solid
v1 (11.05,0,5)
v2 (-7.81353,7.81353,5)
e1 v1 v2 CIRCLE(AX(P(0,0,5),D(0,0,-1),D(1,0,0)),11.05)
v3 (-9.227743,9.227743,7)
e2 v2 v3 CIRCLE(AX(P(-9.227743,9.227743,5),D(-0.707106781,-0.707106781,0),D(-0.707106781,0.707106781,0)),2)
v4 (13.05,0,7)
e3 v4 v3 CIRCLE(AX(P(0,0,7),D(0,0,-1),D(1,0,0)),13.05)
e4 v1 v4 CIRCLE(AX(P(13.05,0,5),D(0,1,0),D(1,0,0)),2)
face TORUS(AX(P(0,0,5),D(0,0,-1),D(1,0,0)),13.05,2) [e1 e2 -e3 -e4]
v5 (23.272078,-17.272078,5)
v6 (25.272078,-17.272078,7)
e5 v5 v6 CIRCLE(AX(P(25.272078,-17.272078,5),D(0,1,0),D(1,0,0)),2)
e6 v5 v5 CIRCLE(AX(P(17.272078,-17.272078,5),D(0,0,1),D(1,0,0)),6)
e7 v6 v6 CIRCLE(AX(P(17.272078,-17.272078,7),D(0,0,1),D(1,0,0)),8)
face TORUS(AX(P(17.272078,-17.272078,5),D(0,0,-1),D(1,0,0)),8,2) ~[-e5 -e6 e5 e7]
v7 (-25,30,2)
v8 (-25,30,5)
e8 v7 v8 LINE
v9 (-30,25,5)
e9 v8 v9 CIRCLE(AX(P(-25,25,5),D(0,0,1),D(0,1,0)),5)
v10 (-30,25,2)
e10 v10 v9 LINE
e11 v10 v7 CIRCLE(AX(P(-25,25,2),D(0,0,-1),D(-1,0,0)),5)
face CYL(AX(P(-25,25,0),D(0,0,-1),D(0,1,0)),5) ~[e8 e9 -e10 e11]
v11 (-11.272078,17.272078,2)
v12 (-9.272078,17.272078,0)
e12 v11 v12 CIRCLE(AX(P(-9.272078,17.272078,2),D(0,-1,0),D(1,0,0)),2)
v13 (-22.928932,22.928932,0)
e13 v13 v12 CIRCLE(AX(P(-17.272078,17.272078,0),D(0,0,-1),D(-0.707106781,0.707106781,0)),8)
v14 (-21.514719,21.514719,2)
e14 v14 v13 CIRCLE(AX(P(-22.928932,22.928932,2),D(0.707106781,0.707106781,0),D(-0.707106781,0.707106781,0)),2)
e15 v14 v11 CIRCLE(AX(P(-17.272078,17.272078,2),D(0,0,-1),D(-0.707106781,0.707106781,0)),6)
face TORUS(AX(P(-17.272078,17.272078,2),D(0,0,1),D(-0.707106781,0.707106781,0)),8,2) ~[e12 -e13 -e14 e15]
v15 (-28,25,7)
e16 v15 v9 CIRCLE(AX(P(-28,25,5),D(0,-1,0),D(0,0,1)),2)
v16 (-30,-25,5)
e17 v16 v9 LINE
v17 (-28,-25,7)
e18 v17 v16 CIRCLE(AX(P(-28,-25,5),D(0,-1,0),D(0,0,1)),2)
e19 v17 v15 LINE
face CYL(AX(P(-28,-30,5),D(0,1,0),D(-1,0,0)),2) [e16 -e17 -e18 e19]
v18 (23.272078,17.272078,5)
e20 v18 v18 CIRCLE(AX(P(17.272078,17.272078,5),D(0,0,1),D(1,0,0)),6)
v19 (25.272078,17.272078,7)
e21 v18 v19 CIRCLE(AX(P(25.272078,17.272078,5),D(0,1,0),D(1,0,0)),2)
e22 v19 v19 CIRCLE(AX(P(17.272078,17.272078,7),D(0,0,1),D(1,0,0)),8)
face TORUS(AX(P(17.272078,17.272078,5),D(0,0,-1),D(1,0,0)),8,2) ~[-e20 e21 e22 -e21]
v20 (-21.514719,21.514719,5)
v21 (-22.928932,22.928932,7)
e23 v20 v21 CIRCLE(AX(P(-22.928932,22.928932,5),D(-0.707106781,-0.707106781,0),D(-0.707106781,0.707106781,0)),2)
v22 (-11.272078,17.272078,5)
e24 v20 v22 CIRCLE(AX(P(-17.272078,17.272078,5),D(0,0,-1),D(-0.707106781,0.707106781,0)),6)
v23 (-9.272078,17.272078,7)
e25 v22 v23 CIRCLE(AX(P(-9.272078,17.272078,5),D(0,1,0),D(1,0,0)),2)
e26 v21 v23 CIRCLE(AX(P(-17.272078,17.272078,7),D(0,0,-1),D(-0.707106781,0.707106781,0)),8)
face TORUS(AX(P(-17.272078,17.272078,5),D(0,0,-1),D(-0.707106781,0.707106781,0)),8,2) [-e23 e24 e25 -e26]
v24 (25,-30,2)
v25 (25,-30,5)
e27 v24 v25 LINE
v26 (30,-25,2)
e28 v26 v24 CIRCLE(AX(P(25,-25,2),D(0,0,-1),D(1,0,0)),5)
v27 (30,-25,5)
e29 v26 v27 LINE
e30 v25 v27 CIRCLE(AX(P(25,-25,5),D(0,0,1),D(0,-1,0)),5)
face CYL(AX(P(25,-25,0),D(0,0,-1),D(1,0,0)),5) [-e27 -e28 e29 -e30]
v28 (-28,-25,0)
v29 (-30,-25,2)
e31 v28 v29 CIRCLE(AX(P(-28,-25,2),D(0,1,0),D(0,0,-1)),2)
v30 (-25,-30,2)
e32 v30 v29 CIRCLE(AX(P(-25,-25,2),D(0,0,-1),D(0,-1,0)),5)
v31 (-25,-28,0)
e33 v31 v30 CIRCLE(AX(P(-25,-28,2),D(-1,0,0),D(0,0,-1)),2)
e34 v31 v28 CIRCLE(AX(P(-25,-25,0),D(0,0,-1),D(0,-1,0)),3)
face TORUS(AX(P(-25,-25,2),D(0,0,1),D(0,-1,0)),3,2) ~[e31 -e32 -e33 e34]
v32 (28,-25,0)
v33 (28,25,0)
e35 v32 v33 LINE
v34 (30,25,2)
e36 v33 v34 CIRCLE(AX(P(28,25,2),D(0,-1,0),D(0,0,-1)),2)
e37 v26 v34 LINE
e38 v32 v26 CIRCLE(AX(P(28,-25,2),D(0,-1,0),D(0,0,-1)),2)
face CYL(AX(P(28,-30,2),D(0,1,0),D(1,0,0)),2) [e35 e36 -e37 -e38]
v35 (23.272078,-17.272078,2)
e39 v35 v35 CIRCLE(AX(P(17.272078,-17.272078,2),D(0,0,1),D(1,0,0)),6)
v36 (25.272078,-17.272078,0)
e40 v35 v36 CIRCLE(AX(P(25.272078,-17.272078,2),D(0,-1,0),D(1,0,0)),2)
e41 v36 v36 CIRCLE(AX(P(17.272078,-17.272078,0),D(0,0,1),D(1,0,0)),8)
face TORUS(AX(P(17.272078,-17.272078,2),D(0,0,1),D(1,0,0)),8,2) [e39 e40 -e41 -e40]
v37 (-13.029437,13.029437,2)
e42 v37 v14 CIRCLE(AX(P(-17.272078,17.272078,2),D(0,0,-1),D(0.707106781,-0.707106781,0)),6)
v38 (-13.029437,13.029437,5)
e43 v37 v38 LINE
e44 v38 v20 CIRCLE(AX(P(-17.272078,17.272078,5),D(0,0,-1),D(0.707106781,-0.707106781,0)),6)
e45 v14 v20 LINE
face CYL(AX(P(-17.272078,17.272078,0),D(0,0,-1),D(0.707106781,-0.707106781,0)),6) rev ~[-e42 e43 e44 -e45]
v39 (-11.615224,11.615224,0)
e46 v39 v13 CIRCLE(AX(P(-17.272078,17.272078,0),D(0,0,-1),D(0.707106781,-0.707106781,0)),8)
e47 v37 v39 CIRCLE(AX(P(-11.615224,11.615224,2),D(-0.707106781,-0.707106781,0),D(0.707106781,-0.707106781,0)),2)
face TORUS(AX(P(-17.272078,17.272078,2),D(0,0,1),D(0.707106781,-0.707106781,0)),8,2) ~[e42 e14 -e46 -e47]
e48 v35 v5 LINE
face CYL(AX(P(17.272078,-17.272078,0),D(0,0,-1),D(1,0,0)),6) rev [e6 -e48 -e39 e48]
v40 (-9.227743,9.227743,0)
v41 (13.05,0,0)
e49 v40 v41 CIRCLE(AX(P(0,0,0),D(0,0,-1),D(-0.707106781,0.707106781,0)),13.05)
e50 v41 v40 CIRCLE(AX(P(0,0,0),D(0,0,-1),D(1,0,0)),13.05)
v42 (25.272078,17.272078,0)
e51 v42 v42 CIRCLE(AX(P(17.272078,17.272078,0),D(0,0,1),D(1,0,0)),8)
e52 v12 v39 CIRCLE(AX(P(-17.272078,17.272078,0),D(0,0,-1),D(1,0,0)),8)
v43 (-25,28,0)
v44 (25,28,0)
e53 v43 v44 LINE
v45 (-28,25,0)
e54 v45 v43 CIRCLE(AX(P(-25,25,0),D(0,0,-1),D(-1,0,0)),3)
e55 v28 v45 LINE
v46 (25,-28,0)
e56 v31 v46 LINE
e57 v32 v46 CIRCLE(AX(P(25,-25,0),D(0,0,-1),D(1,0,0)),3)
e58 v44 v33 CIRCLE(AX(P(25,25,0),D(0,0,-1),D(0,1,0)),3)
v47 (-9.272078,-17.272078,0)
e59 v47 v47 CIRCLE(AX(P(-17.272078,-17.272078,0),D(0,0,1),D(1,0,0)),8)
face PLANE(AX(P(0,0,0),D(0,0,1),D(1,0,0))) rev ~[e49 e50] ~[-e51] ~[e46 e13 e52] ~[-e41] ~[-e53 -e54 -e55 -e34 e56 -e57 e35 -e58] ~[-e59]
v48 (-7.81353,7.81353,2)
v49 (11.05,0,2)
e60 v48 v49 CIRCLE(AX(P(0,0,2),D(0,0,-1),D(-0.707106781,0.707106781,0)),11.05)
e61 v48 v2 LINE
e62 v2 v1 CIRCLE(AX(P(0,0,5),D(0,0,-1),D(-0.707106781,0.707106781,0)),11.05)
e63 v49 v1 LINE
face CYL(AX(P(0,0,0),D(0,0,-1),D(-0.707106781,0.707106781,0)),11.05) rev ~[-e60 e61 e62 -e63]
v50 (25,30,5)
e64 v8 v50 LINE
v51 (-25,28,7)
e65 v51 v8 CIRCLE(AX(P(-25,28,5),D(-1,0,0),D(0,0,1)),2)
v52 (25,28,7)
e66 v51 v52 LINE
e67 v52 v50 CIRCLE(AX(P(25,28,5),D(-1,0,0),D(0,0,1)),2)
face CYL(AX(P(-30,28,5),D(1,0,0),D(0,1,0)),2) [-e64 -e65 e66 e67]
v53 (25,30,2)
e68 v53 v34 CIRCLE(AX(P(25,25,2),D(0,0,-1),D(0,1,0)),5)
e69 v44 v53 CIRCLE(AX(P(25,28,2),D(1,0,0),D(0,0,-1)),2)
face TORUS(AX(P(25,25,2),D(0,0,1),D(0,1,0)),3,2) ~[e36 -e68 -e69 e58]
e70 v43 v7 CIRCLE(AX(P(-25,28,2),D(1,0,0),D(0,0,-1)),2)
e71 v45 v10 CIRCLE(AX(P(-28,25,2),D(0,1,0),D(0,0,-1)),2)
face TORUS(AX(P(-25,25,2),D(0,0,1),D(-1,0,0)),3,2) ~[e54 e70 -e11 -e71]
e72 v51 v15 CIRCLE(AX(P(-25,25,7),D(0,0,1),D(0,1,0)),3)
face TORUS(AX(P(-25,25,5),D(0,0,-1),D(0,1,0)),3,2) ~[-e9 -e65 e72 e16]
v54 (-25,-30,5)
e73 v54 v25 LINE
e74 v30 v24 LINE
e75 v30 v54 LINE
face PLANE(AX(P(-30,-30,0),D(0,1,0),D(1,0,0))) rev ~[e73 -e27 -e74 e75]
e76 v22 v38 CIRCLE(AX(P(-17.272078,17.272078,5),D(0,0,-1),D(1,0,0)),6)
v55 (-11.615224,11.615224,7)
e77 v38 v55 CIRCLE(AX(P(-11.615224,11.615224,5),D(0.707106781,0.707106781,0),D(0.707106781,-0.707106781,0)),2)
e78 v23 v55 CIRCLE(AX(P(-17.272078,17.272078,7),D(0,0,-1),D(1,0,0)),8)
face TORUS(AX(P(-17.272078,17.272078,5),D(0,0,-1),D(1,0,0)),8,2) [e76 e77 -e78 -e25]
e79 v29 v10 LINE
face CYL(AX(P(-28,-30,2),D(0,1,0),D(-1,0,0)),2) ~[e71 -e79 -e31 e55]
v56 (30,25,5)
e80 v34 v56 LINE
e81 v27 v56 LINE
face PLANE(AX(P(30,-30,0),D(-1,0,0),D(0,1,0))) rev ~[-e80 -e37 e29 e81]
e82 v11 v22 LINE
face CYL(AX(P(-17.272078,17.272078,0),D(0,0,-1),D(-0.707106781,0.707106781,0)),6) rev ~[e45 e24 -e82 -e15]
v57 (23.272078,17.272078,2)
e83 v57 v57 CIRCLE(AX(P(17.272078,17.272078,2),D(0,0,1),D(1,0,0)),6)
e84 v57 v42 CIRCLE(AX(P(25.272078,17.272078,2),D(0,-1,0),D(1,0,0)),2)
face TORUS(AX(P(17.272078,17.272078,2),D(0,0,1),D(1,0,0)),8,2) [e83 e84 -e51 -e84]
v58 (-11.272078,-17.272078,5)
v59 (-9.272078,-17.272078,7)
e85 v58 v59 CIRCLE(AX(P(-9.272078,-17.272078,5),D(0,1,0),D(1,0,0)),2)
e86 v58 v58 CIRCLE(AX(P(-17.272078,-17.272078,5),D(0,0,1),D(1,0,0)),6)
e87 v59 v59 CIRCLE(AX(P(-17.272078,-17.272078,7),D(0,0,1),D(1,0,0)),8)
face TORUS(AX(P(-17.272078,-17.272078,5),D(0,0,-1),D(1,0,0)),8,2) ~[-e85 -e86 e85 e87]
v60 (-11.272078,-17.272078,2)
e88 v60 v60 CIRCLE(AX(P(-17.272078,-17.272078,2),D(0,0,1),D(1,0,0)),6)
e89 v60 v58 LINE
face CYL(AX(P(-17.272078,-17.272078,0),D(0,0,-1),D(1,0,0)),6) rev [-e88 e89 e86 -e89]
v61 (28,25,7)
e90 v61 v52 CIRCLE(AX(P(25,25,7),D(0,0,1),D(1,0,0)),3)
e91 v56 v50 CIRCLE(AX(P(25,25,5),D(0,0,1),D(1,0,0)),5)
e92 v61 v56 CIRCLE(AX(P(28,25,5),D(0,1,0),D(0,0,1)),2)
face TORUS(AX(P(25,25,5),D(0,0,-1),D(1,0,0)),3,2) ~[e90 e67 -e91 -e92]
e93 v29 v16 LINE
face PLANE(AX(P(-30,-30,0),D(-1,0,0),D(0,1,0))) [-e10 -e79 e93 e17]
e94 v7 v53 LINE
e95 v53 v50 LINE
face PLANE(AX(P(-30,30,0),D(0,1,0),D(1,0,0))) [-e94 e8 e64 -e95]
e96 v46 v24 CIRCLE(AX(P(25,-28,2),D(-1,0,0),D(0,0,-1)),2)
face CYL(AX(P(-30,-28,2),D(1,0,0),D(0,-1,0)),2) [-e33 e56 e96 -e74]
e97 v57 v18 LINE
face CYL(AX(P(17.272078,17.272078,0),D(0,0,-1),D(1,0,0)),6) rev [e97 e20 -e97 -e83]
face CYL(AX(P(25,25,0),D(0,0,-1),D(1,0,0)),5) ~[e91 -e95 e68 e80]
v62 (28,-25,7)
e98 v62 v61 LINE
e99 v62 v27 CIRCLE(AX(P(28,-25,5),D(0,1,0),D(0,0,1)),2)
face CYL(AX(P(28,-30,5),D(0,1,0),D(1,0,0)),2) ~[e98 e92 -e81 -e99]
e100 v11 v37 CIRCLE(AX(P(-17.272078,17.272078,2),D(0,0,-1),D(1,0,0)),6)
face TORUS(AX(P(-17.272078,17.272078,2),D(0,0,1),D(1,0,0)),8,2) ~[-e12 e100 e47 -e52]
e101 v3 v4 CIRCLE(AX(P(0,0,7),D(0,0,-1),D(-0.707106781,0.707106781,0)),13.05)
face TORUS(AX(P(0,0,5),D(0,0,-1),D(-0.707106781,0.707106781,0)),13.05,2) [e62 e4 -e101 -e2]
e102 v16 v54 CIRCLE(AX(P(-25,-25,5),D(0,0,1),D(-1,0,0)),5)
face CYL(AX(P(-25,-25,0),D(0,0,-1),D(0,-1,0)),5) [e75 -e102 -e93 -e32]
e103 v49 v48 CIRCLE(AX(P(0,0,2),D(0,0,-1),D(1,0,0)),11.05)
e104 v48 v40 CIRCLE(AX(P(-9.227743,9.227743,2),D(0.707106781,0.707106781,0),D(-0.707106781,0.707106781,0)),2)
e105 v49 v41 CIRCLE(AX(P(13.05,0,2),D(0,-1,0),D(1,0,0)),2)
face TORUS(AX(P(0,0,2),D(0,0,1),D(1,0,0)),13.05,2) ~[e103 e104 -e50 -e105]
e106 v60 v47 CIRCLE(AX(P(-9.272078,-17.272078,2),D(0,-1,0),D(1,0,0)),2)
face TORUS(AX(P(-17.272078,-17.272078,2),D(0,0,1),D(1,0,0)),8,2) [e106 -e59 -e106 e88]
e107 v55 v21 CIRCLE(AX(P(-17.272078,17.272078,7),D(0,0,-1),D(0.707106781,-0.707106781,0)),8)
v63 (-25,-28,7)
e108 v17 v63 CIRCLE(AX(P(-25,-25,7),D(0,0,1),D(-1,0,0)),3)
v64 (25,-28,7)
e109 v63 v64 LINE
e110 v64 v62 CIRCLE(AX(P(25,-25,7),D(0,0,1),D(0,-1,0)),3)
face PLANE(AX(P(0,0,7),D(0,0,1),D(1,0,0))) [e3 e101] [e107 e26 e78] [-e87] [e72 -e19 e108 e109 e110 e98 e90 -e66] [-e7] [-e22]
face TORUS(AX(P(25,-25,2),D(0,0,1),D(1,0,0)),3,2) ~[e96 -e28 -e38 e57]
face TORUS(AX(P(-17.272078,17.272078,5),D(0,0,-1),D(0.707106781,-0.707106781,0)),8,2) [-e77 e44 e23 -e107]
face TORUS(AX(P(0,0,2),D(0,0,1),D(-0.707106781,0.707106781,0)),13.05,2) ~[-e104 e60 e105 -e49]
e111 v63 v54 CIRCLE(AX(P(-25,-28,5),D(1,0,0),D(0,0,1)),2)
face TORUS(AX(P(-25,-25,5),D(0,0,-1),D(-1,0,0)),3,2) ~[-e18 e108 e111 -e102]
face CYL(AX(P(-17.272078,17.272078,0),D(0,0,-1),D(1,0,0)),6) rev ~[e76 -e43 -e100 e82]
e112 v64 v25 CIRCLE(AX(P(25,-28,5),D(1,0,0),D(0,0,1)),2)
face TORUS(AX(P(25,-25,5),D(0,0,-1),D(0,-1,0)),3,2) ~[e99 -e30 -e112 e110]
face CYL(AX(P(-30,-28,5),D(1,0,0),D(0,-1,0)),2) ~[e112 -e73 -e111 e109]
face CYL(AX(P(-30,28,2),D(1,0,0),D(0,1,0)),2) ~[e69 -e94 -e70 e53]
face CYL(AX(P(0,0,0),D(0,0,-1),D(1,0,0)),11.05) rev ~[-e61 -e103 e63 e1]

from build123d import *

# Parameters (mm, degrees)
F0_W         = 60
F0_H         = 60
F0_R         = 6
F1_DEPTH     = 7
F2_R         = 2
F3_T1_DEPTH  = 7
F3_T4_ANGLE  = 90
F3_T6_ANGLE  = 90
F3_T8_ANGLE  = 90
F3_T10_ANGLE = 90
F3_T12_ANGLE = 90
F3_T14_ANGLE = 90
F3_T16_ANGLE = 90
F3_T18_ANGLE = 90


# Not quite as in the source:
# - a fillet or chamfer that OpenCascade refuses, or shapes differently, is made with other operations: its cross-section is extruded or revolved along the edge and cut away or added


with BuildPart() as f1:
    # F0 (on Top) → F1 (new body)
    with BuildSketch(Plane.XY):
        Rectangle(F0_W, F0_H)
        with Locations((-17.2720779386, -17.2720779386)):
            Circle(F0_R, mode=Mode.SUBTRACT)
        with Locations((17.2720779386, -17.2720779386)):
            Circle(F0_R, mode=Mode.SUBTRACT)
        with BuildLine():
            ThreePointArc((-13.0294372515, 13.0294372515), (-21.5147186258, 13.0294372515), (-21.5147186258, 21.5147186258))
            ThreePointArc((-21.5147186258, 21.5147186258), (-14.9759773445, 22.8153551337), (-11.2720779386, 17.2720779386))
            ThreePointArc((-11.2720779386, 17.2720779386), (-11.7288007436, 14.9759773445), (-13.0294372515, 13.0294372515))
        make_face(mode=Mode.SUBTRACT)
        with BuildLine():
            ThreePointArc((11.05, 0), (-4.2286519276, -10.2088688342), (-7.8135299321, 7.8135299321))
            ThreePointArc((-7.8135299321, 7.8135299321), (4.2286519276, 10.2088688342), (11.05, 0))
        make_face(mode=Mode.SUBTRACT)
        with Locations((17.2720779386, 17.2720779386)):
            Circle(F0_R, mode=Mode.SUBTRACT)
    extrude(amount=F1_DEPTH)

    # F2
    f2_edges = [f1.edges().sort_by_distance(p)[0] for p in [
        (30, 0, 7),
        (0, 30, 7),
        (-30, 0, 7),
        (0, -30, 7),
        (-23.272078, -17.272078, 7),
        (11.272078, -17.272078, 7),
        (-23.272078, 17.272078, 7),
        (7.81353, -7.81353, 7),
        (11.272078, 17.272078, 7),
        (30, 0, 0),
        (0, 30, 0),
        (-30, 0, 0),
        (0, -30, 0),
        (-23.272078, -17.272078, 0),
        (11.272078, -17.272078, 0),
        (-23.272078, 17.272078, 0),
        (7.81353, -7.81353, 0),
        (11.272078, 17.272078, 0),
    ]]
    fillet(f2_edges, radius=F2_R)

    # F3: fillet of radius 5 on 4 edges, made by hand

    # F3_s2 → F3_t1 (cut)
    with BuildSketch(Plane.XY):
        with BuildLine():
            ThreePointArc((-25, -30), (-28.5355339059, -28.5355339059), (-30, -25))
            Line((-30, -25), (-30, -30))
            Line((-30, -30), (-25, -30))
        make_face()
        with BuildLine():
            ThreePointArc((-25, 30), (-28.5355339059, 28.5355339059), (-30, 25))
            Line((-30, 25), (-30, 30))
            Line((-30, 30), (-25, 30))
        make_face()
        with BuildLine():
            ThreePointArc((30, 25), (28.5355339059, 28.5355339059), (25, 30))
            Line((25, 30), (30, 30))
            Line((30, 30), (30, 25))
        make_face()
        with BuildLine():
            ThreePointArc((30, -25), (28.5355339059, -28.5355339059), (25, -30))
            Line((25, -30), (30, -30))
            Line((30, -30), (30, -25))
        make_face()
    extrude(amount=F3_T1_DEPTH, mode=Mode.SUBTRACT)

    # F3_s3 → F3_t4 (revolve, cut)
    with BuildSketch(Plane.XZ.offset(25)):
        with BuildLine():
            ThreePointArc((28, 0), (29.4142135624, 0.5857864376), (30, 2))
            Line((30, 2), (30, 0))
            Line((30, 0), (28, 0))
        make_face()
    revolve(axis=Axis((25, -25, 0), (0, 0, -1)), revolution_arc=F3_T4_ANGLE, mode=Mode.SUBTRACT)

    # F3_s5 → F3_t6 (revolve, cut)
    with BuildSketch(Plane.YZ.offset(25)):
        with BuildLine():
            ThreePointArc((-28, 7), (-29.4142135624, 6.4142135624), (-30, 5))
            Line((-30, 5), (-30, 7))
            Line((-30, 7), (-28, 7))
        make_face()
    revolve(axis=Axis((25, -25, 7), (0, 0, 1)), revolution_arc=F3_T6_ANGLE, mode=Mode.SUBTRACT)

    # F3_s7 → F3_t8 (revolve, cut)
    with BuildSketch(Plane.YZ.offset(25)):
        with BuildLine():
            ThreePointArc((28, 0), (29.4142135624, 0.5857864376), (30, 2))
            Line((30, 2), (30, 0))
            Line((30, 0), (28, 0))
        make_face()
    revolve(axis=Axis((25, 25, 0), (0, 0, -1)), revolution_arc=F3_T8_ANGLE, mode=Mode.SUBTRACT)

    # F3_s9 → F3_t10 (revolve, cut)
    with BuildSketch(Plane.XZ.offset(-25)):
        with BuildLine():
            ThreePointArc((28, 7), (29.4142135624, 6.4142135624), (30, 5))
            Line((30, 5), (30, 7))
            Line((30, 7), (28, 7))
        make_face()
    revolve(axis=Axis((25, 25, 7), (0, 0, 1)), revolution_arc=F3_T10_ANGLE, mode=Mode.SUBTRACT)

    # F3_s11 → F3_t12 (revolve, cut)
    with BuildSketch(Plane.XZ.offset(-25)):
        with BuildLine():
            ThreePointArc((-28, 0), (-29.4142135624, 0.5857864376), (-30, 2))
            Line((-30, 2), (-30, 0))
            Line((-30, 0), (-28, 0))
        make_face()
    revolve(axis=Axis((-25, 25, 0), (0, 0, -1)), revolution_arc=F3_T12_ANGLE, mode=Mode.SUBTRACT)

    # F3_s13 → F3_t14 (revolve, cut)
    with BuildSketch(Plane.YZ.offset(-25)):
        with BuildLine():
            ThreePointArc((28, 7), (29.4142135624, 6.4142135624), (30, 5))
            Line((30, 5), (30, 7))
            Line((30, 7), (28, 7))
        make_face()
    revolve(axis=Axis((-25, 25, 7), (0, 0, 1)), revolution_arc=F3_T14_ANGLE, mode=Mode.SUBTRACT)

    # F3_s15 → F3_t16 (revolve, cut)
    with BuildSketch(Plane.YZ.offset(-25)):
        with BuildLine():
            ThreePointArc((-28, 0), (-29.4142135624, 0.5857864376), (-30, 2))
            Line((-30, 2), (-30, 0))
            Line((-30, 0), (-28, 0))
        make_face()
    revolve(axis=Axis((-25, -25, 0), (0, 0, -1)), revolution_arc=F3_T16_ANGLE, mode=Mode.SUBTRACT)

    # F3_s17 → F3_t18 (revolve, cut)
    with BuildSketch(Plane.XZ.offset(25)):
        with BuildLine():
            ThreePointArc((-28, 7), (-29.4142135624, 6.4142135624), (-30, 5))
            Line((-30, 5), (-30, 7))
            Line((-30, 7), (-28, 7))
        make_face()
    revolve(axis=Axis((-25, -25, 7), (0, 0, 1)), revolution_arc=F3_T18_ANGLE, mode=Mode.SUBTRACT)


solid = f1.part
